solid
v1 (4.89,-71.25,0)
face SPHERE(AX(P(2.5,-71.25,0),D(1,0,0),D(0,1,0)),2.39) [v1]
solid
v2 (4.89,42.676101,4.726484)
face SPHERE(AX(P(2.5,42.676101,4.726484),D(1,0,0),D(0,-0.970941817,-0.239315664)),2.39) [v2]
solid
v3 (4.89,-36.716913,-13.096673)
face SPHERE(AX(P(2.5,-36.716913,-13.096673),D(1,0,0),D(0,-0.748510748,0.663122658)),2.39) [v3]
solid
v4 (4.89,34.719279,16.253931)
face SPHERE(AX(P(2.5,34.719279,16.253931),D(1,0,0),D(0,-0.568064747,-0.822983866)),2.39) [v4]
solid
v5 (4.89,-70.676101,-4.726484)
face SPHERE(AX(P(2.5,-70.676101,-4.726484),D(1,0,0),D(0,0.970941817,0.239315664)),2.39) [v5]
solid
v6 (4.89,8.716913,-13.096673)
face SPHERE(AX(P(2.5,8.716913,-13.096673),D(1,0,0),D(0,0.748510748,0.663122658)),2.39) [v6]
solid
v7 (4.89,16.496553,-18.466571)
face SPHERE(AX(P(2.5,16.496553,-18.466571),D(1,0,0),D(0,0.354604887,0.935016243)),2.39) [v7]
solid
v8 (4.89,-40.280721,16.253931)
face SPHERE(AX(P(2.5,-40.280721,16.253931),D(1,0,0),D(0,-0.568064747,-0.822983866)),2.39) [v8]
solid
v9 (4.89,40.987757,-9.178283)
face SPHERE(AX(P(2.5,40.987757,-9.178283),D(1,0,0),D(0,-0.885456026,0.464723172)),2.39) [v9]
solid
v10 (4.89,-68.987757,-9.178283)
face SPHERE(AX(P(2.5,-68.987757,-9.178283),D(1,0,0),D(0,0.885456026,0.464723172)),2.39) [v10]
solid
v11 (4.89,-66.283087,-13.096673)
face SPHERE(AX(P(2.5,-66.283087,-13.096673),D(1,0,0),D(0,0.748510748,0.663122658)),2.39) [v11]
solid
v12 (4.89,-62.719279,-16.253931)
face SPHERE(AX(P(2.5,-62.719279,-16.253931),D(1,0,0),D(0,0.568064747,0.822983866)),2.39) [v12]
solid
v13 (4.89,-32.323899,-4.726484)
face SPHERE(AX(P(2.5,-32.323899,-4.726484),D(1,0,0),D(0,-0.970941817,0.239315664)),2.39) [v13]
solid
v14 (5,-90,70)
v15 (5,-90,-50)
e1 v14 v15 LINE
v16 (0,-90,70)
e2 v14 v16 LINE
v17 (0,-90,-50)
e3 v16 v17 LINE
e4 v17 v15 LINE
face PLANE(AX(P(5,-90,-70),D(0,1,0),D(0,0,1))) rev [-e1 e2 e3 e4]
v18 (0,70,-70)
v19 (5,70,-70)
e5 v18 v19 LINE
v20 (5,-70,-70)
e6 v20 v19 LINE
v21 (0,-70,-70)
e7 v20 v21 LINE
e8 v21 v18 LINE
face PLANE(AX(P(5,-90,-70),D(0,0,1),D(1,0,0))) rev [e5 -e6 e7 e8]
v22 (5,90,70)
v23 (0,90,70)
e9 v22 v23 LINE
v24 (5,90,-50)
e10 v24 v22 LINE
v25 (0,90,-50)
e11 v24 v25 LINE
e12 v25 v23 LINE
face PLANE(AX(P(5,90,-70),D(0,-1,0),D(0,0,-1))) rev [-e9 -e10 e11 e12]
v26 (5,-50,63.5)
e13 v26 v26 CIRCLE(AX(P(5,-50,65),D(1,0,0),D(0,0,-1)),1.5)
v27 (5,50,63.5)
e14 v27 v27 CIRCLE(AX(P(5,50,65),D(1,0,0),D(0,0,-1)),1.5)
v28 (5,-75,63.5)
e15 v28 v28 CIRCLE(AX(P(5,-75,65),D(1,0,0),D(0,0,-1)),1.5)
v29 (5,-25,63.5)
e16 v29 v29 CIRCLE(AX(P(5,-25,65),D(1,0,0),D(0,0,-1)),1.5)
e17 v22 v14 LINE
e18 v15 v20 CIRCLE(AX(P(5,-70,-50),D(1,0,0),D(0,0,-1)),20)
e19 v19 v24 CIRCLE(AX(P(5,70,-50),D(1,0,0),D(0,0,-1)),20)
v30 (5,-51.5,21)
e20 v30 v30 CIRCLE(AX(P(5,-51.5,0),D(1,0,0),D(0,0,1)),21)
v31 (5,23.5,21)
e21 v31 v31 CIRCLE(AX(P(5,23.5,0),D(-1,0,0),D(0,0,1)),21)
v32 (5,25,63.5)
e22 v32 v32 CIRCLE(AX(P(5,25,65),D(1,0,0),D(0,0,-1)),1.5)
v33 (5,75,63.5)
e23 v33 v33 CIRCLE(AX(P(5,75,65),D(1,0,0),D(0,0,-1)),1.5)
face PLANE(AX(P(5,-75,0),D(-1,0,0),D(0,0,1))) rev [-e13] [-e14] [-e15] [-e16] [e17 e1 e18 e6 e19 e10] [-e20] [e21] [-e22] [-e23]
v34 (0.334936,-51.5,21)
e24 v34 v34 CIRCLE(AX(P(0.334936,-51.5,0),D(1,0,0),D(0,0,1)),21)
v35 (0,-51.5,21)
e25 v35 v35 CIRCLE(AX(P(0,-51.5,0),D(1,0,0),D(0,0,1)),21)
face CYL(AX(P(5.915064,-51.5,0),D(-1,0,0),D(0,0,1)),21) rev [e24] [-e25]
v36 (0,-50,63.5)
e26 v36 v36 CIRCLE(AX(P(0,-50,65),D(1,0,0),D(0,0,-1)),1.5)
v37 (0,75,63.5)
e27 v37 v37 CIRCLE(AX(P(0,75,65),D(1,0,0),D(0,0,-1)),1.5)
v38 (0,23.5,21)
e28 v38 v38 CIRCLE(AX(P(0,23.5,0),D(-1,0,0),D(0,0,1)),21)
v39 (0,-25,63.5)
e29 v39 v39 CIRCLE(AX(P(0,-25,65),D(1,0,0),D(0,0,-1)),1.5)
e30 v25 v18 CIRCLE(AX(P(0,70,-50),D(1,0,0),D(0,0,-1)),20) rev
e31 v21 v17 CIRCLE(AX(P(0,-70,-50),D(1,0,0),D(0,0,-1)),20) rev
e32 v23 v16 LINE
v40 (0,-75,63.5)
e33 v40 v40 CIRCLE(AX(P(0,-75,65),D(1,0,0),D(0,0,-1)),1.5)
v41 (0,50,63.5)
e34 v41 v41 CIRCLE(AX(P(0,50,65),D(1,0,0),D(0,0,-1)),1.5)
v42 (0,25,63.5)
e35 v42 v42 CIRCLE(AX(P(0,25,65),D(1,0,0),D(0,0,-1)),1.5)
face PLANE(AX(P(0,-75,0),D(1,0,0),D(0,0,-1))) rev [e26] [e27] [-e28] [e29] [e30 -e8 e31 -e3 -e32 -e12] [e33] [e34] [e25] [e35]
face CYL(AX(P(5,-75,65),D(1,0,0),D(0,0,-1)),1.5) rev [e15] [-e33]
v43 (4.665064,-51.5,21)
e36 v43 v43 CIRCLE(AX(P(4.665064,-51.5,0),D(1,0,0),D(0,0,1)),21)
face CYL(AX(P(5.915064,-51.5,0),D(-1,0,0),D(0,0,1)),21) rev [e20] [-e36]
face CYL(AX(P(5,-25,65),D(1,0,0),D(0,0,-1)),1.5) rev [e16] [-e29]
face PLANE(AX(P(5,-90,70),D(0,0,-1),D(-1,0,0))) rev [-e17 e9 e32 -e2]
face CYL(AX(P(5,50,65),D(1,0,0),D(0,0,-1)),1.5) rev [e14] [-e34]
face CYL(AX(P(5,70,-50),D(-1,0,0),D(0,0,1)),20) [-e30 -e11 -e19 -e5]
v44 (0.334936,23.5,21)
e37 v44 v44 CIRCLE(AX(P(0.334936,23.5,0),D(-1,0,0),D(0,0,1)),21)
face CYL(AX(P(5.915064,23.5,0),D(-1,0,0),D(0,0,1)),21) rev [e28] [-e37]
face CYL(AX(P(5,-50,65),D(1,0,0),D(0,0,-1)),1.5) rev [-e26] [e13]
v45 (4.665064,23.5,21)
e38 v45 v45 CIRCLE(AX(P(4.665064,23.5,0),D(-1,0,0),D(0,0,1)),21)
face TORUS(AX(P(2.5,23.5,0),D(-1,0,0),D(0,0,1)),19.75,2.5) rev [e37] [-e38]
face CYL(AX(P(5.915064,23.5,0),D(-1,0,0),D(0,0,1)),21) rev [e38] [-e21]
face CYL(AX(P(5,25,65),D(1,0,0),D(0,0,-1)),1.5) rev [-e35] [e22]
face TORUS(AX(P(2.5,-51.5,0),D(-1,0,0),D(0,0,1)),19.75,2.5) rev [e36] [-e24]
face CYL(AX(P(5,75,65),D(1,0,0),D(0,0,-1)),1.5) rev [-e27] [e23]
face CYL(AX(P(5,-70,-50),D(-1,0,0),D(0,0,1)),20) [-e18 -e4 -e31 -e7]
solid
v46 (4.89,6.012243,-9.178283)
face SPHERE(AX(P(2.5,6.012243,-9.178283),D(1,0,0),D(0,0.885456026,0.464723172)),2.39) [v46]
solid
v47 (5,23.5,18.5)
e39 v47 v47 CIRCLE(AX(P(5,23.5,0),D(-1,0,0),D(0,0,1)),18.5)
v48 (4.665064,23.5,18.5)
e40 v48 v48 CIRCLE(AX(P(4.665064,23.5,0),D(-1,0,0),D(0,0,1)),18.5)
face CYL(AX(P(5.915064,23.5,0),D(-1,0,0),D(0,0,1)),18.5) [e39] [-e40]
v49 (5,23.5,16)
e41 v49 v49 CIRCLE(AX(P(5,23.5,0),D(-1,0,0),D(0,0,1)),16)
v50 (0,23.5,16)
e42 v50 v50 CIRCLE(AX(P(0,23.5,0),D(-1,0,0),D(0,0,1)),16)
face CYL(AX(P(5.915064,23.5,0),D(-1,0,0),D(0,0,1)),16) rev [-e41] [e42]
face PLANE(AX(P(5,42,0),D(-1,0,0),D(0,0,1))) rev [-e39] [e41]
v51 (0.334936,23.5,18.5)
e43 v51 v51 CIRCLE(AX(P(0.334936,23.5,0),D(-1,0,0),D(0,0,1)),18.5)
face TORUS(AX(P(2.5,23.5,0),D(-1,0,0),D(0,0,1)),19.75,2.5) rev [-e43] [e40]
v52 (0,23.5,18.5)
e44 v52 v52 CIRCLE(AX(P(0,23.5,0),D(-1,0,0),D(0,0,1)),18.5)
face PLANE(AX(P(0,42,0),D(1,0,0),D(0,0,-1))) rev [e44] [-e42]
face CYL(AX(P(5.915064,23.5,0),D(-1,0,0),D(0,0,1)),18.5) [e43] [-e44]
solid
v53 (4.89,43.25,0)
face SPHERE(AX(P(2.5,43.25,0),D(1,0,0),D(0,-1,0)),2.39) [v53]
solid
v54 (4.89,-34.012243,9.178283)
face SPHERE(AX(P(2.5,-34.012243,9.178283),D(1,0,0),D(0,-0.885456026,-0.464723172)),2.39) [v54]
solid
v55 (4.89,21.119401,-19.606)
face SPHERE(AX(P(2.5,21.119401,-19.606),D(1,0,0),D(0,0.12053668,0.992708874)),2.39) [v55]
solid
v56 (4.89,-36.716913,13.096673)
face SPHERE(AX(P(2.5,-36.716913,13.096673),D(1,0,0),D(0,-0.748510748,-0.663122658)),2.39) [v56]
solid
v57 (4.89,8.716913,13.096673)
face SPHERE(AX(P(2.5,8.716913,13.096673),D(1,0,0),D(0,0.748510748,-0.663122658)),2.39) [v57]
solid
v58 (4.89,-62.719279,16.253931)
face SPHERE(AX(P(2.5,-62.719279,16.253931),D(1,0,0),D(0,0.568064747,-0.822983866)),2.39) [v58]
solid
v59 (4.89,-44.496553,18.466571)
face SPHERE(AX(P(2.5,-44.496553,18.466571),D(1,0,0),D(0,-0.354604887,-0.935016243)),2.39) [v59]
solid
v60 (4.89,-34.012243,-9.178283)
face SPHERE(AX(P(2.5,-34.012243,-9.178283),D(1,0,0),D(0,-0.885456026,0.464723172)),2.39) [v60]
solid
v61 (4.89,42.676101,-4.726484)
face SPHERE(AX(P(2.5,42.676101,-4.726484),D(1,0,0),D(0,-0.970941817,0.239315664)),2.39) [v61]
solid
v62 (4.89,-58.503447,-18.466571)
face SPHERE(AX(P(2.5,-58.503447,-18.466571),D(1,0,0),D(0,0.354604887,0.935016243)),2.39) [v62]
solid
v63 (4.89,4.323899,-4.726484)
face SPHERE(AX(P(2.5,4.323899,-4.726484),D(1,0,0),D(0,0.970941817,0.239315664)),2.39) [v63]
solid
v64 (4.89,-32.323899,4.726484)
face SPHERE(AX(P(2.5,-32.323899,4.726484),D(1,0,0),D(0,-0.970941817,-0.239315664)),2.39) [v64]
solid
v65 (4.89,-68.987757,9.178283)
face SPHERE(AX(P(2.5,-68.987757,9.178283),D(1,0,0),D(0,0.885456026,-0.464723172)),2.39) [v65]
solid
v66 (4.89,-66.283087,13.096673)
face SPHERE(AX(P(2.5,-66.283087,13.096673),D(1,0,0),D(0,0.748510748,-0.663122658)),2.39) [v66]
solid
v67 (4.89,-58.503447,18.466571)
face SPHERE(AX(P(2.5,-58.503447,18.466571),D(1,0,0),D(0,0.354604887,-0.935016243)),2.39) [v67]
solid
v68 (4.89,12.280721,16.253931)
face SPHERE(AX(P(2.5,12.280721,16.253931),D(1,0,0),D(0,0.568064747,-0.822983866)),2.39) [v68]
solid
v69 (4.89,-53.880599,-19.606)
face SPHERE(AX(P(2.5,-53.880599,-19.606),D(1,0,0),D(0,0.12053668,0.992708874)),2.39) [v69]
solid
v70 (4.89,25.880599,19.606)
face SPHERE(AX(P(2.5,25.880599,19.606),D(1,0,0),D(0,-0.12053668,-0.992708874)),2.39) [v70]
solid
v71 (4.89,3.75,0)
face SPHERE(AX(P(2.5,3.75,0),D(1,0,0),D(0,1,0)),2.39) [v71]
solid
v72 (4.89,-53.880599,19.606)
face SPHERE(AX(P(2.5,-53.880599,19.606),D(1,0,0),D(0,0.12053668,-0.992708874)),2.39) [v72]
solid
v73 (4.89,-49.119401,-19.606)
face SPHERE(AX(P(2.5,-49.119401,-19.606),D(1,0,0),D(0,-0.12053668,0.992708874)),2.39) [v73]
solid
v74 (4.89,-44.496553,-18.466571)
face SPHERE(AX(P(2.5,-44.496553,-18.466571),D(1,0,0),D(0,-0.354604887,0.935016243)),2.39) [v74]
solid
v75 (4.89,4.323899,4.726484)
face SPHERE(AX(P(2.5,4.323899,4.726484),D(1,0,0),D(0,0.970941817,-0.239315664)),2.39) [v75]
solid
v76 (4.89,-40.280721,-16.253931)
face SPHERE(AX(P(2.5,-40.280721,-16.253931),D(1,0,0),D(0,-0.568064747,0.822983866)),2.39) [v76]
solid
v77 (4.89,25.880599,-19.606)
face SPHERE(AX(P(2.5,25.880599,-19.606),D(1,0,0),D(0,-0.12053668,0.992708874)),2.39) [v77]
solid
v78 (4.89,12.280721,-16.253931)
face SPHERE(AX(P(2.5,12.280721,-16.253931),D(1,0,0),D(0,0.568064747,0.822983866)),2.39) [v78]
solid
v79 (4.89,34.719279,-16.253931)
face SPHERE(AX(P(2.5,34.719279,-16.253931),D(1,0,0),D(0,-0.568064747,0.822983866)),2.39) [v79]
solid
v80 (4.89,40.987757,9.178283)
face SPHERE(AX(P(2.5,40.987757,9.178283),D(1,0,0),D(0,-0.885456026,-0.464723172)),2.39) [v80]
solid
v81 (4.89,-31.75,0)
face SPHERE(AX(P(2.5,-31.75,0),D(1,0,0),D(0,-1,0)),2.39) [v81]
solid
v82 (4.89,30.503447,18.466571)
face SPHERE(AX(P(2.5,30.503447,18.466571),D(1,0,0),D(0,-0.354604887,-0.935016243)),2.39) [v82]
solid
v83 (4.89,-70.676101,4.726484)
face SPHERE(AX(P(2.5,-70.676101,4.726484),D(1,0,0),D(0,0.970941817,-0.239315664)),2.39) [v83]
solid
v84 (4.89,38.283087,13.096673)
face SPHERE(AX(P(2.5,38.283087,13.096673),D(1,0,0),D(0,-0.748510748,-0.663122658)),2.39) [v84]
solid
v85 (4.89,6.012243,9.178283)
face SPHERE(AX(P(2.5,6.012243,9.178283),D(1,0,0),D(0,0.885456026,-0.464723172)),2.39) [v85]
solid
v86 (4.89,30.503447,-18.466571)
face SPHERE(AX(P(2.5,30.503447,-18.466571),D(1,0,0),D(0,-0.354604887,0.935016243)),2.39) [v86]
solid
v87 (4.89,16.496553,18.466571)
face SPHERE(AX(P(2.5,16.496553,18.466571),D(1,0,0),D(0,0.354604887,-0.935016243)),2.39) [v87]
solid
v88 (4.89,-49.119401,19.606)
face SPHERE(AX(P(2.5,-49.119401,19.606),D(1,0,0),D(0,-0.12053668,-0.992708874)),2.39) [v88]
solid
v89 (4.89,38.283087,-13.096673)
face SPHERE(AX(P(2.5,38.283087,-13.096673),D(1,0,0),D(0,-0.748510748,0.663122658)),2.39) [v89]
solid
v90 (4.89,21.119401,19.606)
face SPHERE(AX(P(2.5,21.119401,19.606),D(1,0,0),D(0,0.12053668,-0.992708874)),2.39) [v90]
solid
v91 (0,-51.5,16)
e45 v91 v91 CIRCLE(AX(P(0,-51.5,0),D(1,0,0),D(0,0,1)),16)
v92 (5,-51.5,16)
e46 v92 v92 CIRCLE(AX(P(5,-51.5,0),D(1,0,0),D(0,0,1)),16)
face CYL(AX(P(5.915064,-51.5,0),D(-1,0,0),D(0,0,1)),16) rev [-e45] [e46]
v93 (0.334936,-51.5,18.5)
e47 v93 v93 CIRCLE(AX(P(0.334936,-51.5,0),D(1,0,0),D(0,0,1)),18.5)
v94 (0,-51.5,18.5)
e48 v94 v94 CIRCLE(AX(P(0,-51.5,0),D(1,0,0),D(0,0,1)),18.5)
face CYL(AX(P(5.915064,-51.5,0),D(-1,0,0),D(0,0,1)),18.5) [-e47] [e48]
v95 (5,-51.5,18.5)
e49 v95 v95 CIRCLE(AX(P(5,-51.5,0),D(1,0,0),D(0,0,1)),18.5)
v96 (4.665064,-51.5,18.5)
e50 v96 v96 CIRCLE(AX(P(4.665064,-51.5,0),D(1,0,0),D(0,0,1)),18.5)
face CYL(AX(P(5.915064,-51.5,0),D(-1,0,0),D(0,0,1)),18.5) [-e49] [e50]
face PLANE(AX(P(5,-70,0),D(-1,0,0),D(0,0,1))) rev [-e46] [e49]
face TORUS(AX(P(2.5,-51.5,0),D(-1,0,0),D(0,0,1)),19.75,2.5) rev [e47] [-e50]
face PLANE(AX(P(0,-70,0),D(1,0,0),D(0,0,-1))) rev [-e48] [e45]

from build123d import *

# Parameters (mm, degrees)
SKETCH1_W             = 140
SKETCH1_H             = 180
BOSS_EXTRUDE1_DEPTH   = 5
FILLET3_R             = 20
SKETCH18_R            = 23.5
CUT_EXTRUDE4_DEPTH    = 115.127122105
F_3_0MM_DOWEL_HOLE1_D = 3
CIRPATTERN2_COUNT     = 26


with BuildPart() as part:
    # Sketch1 → Boss-Extrude1 (new body)
    with BuildSketch(Plane(origin=(0, 0, 0), x_dir=(0, 0, -1), z_dir=(1, 0, 0))):
        Rectangle(SKETCH1_W, SKETCH1_H)
    extrude(amount=BOSS_EXTRUDE1_DEPTH)

    # Fillet3
    fillet3_edges = [part.edges().sort_by_distance(p)[0] for p in [
        (2.5, 90, -70),
        (2.5, -90, -70),
    ]]
    fillet(fillet3_edges, radius=FILLET3_R)

    # Sketch18 → Cut-Extrude4 (cut, through all)
    with BuildSketch(Plane(origin=(5, 0, 0), x_dir=(0, 0, -1), z_dir=(1, 0, 0))):
        with Locations((0, 23.5)):
            Circle(SKETCH18_R)
        with Locations((0, -51.5)):
            Circle(SKETCH18_R)
    extrude(amount=-CUT_EXTRUDE4_DEPTH, mode=Mode.SUBTRACT)

    # Ø3.0mm Dowel Hole1 (through all)
    with Locations(Plane(origin=(5, 0, 0), x_dir=(0, 0, -1), z_dir=(1, 0, 0))):
        with Locations((-65, -75), (-65, -50), (-65, -25), (-65, 25), (-65, 50), (-65, 75)):
            Hole(F_3_0MM_DOWEL_HOLE1_D / 2)


with BuildPart() as body_2:
    # Sketch19 → Revolve1 (revolve)
    with BuildSketch(Plane.XY, mode=Mode.PRIVATE) as revolve1_sk:
        with BuildLine():
            Line((5, 47), (0, 47))
            Line((0, 47), (0, 44.5))
            Line((0, 44.5), (0.334936491, 44.5))
            ThreePointArc((0.334936491, 44.5), (2.5, 45.75), (4.665063509, 44.5))
            Line((4.665063509, 44.5), (5, 44.5))
            Line((5, 44.5), (5, 47))
        make_face()
        with BuildLine():
            Line((5, 39.5), (0, 39.5))
            Line((0, 39.5), (0, 42))
            Line((0, 42), (0.334936491, 42))
            ThreePointArc((0.334936491, 42), (2.5, 40.75), (4.665063509, 42))
            Line((4.665063509, 42), (5, 42))
            Line((5, 42), (5, 39.5))
        make_face()
    revolve(revolve1_sk.sketch.rotate(Axis((5.915063509, 23.5, 0), (1, 0, 0)), 90), axis=Axis((5.915063509, 23.5, 0), (1, 0, 0)))


with BuildPart() as body_3:
    # Sketch20 → Revolve2 (revolve)
    with BuildSketch(Plane.XY):
        with BuildLine():
            Line((4.89, 43.25), (0.11, 43.25))
            ThreePointArc((0.11, 43.25), (2.5, 40.86), (4.89, 43.25))
        make_face()
    revolve(axis=Axis((6.375608652, 43.25, 0), (-1, 0, 0)))


with BuildPart() as cirpattern2_1:
    # CirPattern2: pattern copy
    add(body_3.part.rotate(Axis((0, 23.5, 0), (1, 0, 0)), 1 * 360 / CIRPATTERN2_COUNT))


with BuildPart() as cirpattern2_2:
    # CirPattern2: pattern copy
    add(body_3.part.rotate(Axis((0, 23.5, 0), (1, 0, 0)), 2 * 360 / CIRPATTERN2_COUNT))


with BuildPart() as cirpattern2_3:
    # CirPattern2: pattern copy
    add(body_3.part.rotate(Axis((0, 23.5, 0), (1, 0, 0)), 3 * 360 / CIRPATTERN2_COUNT))


with BuildPart() as cirpattern2_4:
    # CirPattern2: pattern copy
    add(body_3.part.rotate(Axis((0, 23.5, 0), (1, 0, 0)), 4 * 360 / CIRPATTERN2_COUNT))


with BuildPart() as cirpattern2_5:
    # CirPattern2: pattern copy
    add(body_3.part.rotate(Axis((0, 23.5, 0), (1, 0, 0)), 5 * 360 / CIRPATTERN2_COUNT))


with BuildPart() as cirpattern2_6:
    # CirPattern2: pattern copy
    add(body_3.part.rotate(Axis((0, 23.5, 0), (1, 0, 0)), 6 * 360 / CIRPATTERN2_COUNT))


with BuildPart() as cirpattern2_7:
    # CirPattern2: pattern copy
    add(body_3.part.rotate(Axis((0, 23.5, 0), (1, 0, 0)), 7 * 360 / CIRPATTERN2_COUNT))


with BuildPart() as cirpattern2_8:
    # CirPattern2: pattern copy
    add(body_3.part.rotate(Axis((0, 23.5, 0), (1, 0, 0)), 8 * 360 / CIRPATTERN2_COUNT))


with BuildPart() as cirpattern2_9:
    # CirPattern2: pattern copy
    add(body_3.part.rotate(Axis((0, 23.5, 0), (1, 0, 0)), 9 * 360 / CIRPATTERN2_COUNT))


with BuildPart() as cirpattern2_10:
    # CirPattern2: pattern copy
    add(body_3.part.rotate(Axis((0, 23.5, 0), (1, 0, 0)), 10 * 360 / CIRPATTERN2_COUNT))


with BuildPart() as cirpattern2_11:
    # CirPattern2: pattern copy
    add(body_3.part.rotate(Axis((0, 23.5, 0), (1, 0, 0)), 11 * 360 / CIRPATTERN2_COUNT))


with BuildPart() as cirpattern2_12:
    # CirPattern2: pattern copy
    add(body_3.part.rotate(Axis((0, 23.5, 0), (1, 0, 0)), 12 * 360 / CIRPATTERN2_COUNT))


with BuildPart() as cirpattern2_13:
    # CirPattern2: pattern copy
    add(body_3.part.rotate(Axis((0, 23.5, 0), (1, 0, 0)), 13 * 360 / CIRPATTERN2_COUNT))


with BuildPart() as cirpattern2_14:
    # CirPattern2: pattern copy
    add(body_3.part.rotate(Axis((0, 23.5, 0), (1, 0, 0)), 14 * 360 / CIRPATTERN2_COUNT))


with BuildPart() as cirpattern2_15:
    # CirPattern2: pattern copy
    add(body_3.part.rotate(Axis((0, 23.5, 0), (1, 0, 0)), 15 * 360 / CIRPATTERN2_COUNT))


with BuildPart() as cirpattern2_16:
    # CirPattern2: pattern copy
    add(body_3.part.rotate(Axis((0, 23.5, 0), (1, 0, 0)), 16 * 360 / CIRPATTERN2_COUNT))


with BuildPart() as cirpattern2_17:
    # CirPattern2: pattern copy
    add(body_3.part.rotate(Axis((0, 23.5, 0), (1, 0, 0)), 17 * 360 / CIRPATTERN2_COUNT))


with BuildPart() as cirpattern2_18:
    # CirPattern2: pattern copy
    add(body_3.part.rotate(Axis((0, 23.5, 0), (1, 0, 0)), 18 * 360 / CIRPATTERN2_COUNT))


with BuildPart() as cirpattern2_19:
    # CirPattern2: pattern copy
    add(body_3.part.rotate(Axis((0, 23.5, 0), (1, 0, 0)), 19 * 360 / CIRPATTERN2_COUNT))


with BuildPart() as cirpattern2_20:
    # CirPattern2: pattern copy
    add(body_3.part.rotate(Axis((0, 23.5, 0), (1, 0, 0)), 20 * 360 / CIRPATTERN2_COUNT))


with BuildPart() as cirpattern2_21:
    # CirPattern2: pattern copy
    add(body_3.part.rotate(Axis((0, 23.5, 0), (1, 0, 0)), 21 * 360 / CIRPATTERN2_COUNT))


with BuildPart() as cirpattern2_22:
    # CirPattern2: pattern copy
    add(body_3.part.rotate(Axis((0, 23.5, 0), (1, 0, 0)), 22 * 360 / CIRPATTERN2_COUNT))


with BuildPart() as cirpattern2_23:
    # CirPattern2: pattern copy
    add(body_3.part.rotate(Axis((0, 23.5, 0), (1, 0, 0)), 23 * 360 / CIRPATTERN2_COUNT))


with BuildPart() as cirpattern2_24:
    # CirPattern2: pattern copy
    add(body_3.part.rotate(Axis((0, 23.5, 0), (1, 0, 0)), 24 * 360 / CIRPATTERN2_COUNT))


with BuildPart() as cirpattern2_25:
    # CirPattern2: pattern copy
    add(body_3.part.rotate(Axis((0, 23.5, 0), (1, 0, 0)), 25 * 360 / CIRPATTERN2_COUNT))


with BuildPart() as body_29:
    # Mirror4: mirrored copy
    add(body_2.part.mirror(Plane.ZX.offset(-14)))


with BuildPart() as body_30:
    # Mirror4 2: mirrored copy
    add(body_3.part.mirror(Plane.ZX.offset(-14)))


with BuildPart() as body_31:
    # Mirror4 3: mirrored copy
    add(cirpattern2_1.part.mirror(Plane.ZX.offset(-14)))


with BuildPart() as body_32:
    # Mirror4 4: mirrored copy
    add(cirpattern2_2.part.mirror(Plane.ZX.offset(-14)))


with BuildPart() as body_33:
    # Mirror4 5: mirrored copy
    add(cirpattern2_3.part.mirror(Plane.ZX.offset(-14)))


with BuildPart() as body_34:
    # Mirror4 6: mirrored copy
    add(cirpattern2_4.part.mirror(Plane.ZX.offset(-14)))


with BuildPart() as body_35:
    # Mirror4 7: mirrored copy
    add(cirpattern2_5.part.mirror(Plane.ZX.offset(-14)))


with BuildPart() as body_36:
    # Mirror4 8: mirrored copy
    add(cirpattern2_6.part.mirror(Plane.ZX.offset(-14)))


with BuildPart() as body_37:
    # Mirror4 9: mirrored copy
    add(cirpattern2_7.part.mirror(Plane.ZX.offset(-14)))


with BuildPart() as body_38:
    # Mirror4 10: mirrored copy
    add(cirpattern2_8.part.mirror(Plane.ZX.offset(-14)))


with BuildPart() as body_39:
    # Mirror4 11: mirrored copy
    add(cirpattern2_9.part.mirror(Plane.ZX.offset(-14)))


with BuildPart() as body_40:
    # Mirror4 12: mirrored copy
    add(cirpattern2_10.part.mirror(Plane.ZX.offset(-14)))


with BuildPart() as body_41:
    # Mirror4 13: mirrored copy
    add(cirpattern2_11.part.mirror(Plane.ZX.offset(-14)))


with BuildPart() as body_42:
    # Mirror4 14: mirrored copy
    add(cirpattern2_12.part.mirror(Plane.ZX.offset(-14)))


with BuildPart() as body_43:
    # Mirror4 15: mirrored copy
    add(cirpattern2_13.part.mirror(Plane.ZX.offset(-14)))


with BuildPart() as body_44:
    # Mirror4 16: mirrored copy
    add(cirpattern2_14.part.mirror(Plane.ZX.offset(-14)))


with BuildPart() as body_45:
    # Mirror4 17: mirrored copy
    add(cirpattern2_15.part.mirror(Plane.ZX.offset(-14)))


with BuildPart() as body_46:
    # Mirror4 18: mirrored copy
    add(cirpattern2_16.part.mirror(Plane.ZX.offset(-14)))


with BuildPart() as body_47:
    # Mirror4 19: mirrored copy
    add(cirpattern2_17.part.mirror(Plane.ZX.offset(-14)))


with BuildPart() as body_48:
    # Mirror4 20: mirrored copy
    add(cirpattern2_18.part.mirror(Plane.ZX.offset(-14)))


with BuildPart() as body_49:
    # Mirror4 21: mirrored copy
    add(cirpattern2_19.part.mirror(Plane.ZX.offset(-14)))


with BuildPart() as body_50:
    # Mirror4 22: mirrored copy
    add(cirpattern2_20.part.mirror(Plane.ZX.offset(-14)))


with BuildPart() as body_51:
    # Mirror4 23: mirrored copy
    add(cirpattern2_21.part.mirror(Plane.ZX.offset(-14)))


with BuildPart() as body_52:
    # Mirror4 24: mirrored copy
    add(cirpattern2_22.part.mirror(Plane.ZX.offset(-14)))


with BuildPart() as body_53:
    # Mirror4 25: mirrored copy
    add(cirpattern2_23.part.mirror(Plane.ZX.offset(-14)))


with BuildPart() as body_54:
    # Mirror4 26: mirrored copy
    add(cirpattern2_24.part.mirror(Plane.ZX.offset(-14)))


with BuildPart() as body_55:
    # Mirror4 27: mirrored copy
    add(cirpattern2_25.part.mirror(Plane.ZX.offset(-14)))


with BuildPart() as part_1:
    add(part.part)

    # Intersect1: read off the stored shape, not the designer's step
    # Intersect1: union body 29, body 2
    add(body_29.part)
    add(body_2.part)


solid = Compound([body_3.part, cirpattern2_1.part, cirpattern2_2.part, cirpattern2_3.part, cirpattern2_4.part, cirpattern2_5.part, cirpattern2_6.part, cirpattern2_7.part, cirpattern2_8.part, cirpattern2_9.part, cirpattern2_10.part, cirpattern2_11.part, cirpattern2_12.part, cirpattern2_13.part, cirpattern2_14.part, cirpattern2_15.part, cirpattern2_16.part, cirpattern2_17.part, cirpattern2_18.part, cirpattern2_19.part, cirpattern2_20.part, cirpattern2_21.part, cirpattern2_22.part, cirpattern2_23.part, cirpattern2_24.part, cirpattern2_25.part, body_30.part, body_31.part, body_32.part, body_33.part, body_34.part, body_35.part, body_36.part, body_37.part, body_38.part, body_39.part, body_40.part, body_41.part, body_42.part, body_43.part, body_44.part, body_45.part, body_46.part, body_47.part, body_48.part, body_49.part, body_50.part, body_51.part, body_52.part, body_53.part, body_54.part, body_55.part, part_1.part])
